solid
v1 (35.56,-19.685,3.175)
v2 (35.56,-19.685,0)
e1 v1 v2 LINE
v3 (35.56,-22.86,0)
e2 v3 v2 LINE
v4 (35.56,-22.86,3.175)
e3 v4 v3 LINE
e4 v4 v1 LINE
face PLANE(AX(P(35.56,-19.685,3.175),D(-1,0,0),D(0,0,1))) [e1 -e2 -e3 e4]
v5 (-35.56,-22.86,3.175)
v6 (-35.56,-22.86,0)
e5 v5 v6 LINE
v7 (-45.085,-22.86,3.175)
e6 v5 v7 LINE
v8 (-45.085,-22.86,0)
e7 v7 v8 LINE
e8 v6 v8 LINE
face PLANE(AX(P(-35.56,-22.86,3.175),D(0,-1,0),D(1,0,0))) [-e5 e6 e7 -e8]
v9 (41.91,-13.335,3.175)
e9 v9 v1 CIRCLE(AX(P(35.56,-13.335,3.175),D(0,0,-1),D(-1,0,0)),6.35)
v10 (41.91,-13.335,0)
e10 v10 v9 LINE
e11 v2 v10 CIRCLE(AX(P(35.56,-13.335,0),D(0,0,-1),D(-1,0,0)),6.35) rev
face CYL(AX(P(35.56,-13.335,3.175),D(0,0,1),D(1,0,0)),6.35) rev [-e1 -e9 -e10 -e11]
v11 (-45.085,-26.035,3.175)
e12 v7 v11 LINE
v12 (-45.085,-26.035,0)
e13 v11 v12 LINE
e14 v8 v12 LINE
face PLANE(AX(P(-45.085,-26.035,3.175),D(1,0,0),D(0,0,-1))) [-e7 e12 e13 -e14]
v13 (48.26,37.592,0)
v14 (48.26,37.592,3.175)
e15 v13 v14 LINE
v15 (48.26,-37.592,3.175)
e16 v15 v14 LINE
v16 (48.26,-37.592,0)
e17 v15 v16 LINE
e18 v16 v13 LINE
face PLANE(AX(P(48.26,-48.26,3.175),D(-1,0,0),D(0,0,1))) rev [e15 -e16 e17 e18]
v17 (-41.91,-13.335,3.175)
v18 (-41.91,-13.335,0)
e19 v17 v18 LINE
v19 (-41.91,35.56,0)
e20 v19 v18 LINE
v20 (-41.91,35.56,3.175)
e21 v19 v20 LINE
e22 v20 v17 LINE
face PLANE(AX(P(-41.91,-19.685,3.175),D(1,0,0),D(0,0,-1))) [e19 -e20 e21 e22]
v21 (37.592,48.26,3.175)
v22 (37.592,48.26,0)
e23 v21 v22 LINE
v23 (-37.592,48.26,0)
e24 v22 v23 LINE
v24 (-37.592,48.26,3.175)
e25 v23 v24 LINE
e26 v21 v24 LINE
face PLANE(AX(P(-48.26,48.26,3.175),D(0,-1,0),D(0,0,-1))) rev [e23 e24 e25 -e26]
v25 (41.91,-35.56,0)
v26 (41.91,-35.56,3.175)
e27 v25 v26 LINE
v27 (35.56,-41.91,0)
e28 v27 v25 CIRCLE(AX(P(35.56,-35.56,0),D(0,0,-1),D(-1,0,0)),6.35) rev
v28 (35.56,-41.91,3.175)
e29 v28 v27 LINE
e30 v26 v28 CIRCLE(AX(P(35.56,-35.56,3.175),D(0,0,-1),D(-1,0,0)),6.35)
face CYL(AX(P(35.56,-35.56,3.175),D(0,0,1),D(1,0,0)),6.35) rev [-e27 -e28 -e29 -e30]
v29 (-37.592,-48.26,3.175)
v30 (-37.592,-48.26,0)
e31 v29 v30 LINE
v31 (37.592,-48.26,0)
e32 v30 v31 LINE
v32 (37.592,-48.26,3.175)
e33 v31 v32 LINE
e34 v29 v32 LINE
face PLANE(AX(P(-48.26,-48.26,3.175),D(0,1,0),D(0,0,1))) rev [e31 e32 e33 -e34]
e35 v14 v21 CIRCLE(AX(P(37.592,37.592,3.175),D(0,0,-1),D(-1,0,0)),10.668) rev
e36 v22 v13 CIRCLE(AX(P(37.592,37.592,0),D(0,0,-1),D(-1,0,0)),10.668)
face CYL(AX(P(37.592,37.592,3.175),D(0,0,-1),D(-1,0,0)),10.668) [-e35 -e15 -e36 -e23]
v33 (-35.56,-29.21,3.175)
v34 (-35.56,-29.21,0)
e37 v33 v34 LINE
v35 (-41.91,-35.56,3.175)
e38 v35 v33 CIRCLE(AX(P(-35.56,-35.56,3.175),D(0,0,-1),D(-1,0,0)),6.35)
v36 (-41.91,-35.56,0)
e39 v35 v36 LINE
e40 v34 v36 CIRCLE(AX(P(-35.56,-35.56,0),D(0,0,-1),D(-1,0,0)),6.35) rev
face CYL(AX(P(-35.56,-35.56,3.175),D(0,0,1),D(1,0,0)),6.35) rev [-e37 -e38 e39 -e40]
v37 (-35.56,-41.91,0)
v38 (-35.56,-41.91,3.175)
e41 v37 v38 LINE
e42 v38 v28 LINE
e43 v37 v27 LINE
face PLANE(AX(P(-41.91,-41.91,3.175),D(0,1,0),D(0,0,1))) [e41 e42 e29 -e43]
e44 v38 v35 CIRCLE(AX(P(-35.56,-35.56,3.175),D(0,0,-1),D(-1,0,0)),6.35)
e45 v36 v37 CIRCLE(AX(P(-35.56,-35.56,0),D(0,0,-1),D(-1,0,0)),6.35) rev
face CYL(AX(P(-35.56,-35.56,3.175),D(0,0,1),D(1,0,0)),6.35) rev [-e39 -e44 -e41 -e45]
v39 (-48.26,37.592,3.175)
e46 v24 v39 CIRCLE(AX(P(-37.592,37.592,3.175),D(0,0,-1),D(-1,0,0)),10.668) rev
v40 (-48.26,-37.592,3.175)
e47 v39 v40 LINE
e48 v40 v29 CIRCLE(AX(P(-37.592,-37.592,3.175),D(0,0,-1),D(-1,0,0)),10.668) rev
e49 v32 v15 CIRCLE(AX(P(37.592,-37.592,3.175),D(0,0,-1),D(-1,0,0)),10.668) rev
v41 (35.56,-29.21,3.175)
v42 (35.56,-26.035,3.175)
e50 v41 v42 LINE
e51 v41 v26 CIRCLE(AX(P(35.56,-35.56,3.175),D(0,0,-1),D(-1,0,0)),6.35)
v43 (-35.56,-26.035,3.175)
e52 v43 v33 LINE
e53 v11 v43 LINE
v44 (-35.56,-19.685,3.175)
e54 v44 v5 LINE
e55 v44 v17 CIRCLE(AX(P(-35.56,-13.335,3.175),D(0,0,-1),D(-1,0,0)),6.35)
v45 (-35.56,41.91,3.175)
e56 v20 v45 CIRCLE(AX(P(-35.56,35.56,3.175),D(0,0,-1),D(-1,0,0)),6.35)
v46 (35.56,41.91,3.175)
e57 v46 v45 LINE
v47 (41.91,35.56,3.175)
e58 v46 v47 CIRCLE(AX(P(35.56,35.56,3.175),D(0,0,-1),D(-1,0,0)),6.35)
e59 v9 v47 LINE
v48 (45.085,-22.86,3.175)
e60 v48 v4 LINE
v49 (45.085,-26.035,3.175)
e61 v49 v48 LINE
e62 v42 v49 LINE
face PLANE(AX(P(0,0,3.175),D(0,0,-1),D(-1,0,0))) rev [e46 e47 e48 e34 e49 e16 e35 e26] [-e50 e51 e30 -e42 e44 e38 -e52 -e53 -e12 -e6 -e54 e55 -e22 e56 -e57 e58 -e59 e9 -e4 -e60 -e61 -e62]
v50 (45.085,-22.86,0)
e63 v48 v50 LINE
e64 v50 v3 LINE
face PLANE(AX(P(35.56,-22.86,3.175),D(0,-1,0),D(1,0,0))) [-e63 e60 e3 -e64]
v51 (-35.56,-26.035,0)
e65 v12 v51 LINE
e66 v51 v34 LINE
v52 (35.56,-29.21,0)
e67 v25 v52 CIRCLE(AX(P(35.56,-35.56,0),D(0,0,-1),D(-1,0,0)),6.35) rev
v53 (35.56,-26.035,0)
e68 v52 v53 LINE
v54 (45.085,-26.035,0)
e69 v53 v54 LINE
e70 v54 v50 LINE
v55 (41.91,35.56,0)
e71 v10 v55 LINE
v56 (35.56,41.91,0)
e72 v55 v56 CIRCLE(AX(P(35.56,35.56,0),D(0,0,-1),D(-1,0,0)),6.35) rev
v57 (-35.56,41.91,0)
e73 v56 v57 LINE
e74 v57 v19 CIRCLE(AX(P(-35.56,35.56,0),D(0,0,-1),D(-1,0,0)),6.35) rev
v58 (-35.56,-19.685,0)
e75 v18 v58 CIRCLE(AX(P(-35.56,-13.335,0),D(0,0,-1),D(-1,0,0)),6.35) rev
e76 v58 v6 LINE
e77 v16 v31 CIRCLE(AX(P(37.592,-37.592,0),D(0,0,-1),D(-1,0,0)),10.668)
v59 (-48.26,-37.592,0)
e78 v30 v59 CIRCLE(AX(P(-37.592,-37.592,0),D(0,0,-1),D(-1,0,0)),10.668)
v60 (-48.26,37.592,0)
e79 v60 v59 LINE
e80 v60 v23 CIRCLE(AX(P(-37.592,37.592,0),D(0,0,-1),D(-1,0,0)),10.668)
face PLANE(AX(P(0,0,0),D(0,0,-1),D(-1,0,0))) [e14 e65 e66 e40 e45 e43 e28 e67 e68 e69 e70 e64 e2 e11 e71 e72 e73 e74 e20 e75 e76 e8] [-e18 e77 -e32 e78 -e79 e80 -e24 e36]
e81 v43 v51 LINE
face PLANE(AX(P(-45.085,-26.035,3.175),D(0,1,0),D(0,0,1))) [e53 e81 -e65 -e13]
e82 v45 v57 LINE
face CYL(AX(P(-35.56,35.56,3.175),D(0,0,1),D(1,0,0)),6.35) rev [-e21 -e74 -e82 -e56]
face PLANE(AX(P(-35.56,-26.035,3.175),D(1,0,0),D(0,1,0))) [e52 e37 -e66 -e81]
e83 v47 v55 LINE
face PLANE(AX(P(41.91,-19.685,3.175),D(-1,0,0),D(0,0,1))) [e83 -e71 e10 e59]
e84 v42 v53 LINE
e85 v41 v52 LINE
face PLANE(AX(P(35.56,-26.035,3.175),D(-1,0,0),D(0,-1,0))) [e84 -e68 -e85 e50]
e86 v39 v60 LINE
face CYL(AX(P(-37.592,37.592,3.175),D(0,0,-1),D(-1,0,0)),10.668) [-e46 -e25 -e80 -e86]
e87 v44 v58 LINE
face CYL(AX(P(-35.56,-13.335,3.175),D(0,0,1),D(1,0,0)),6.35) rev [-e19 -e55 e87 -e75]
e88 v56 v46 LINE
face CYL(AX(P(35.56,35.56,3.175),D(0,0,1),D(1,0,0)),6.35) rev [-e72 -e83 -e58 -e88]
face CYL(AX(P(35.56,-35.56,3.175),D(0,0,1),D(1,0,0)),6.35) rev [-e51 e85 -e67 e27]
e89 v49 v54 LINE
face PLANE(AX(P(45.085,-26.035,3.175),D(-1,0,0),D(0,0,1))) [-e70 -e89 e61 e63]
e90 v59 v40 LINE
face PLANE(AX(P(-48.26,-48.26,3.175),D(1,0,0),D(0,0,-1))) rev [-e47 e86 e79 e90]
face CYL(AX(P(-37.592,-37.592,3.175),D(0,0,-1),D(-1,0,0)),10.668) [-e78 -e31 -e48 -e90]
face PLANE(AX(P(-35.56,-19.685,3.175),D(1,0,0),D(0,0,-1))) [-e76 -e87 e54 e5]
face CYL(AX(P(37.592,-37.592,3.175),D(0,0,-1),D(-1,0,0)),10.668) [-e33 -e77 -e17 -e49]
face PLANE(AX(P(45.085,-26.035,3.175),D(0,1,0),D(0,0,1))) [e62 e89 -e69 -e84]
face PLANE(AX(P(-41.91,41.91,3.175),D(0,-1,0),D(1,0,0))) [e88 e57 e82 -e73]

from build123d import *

# Parameters (mm, degrees)
SKETCH1_W           = 96.52
SKETCH1_H           = 96.52
BOSS_EXTRUDE1_DEPTH = 3.175
FILLET1_R           = 10.668
FILLET2_R           = 6.35
FILLET3_R           = 6.35


with BuildPart() as part:
    # Sketch1 → Boss-Extrude1 (new body)
    with BuildSketch(Plane.XY):
        Rectangle(SKETCH1_W, SKETCH1_H)
        Polygon((-41.91, -41.91), (-41.91, -29.21), (-35.56, -29.21), (-35.56, -26.035), (-45.085, -26.035), (-45.085, -22.86), (-35.56, -22.86), (-35.56, -19.685), (-41.91, -19.685), (-41.91, 41.91), (41.91, 41.91), (41.91, -19.685), (35.56, -19.685), (35.56, -22.86), (45.085, -22.86), (45.085, -26.035), (35.56, -26.035), (35.56, -29.21), (41.91, -29.21), (41.91, -41.91), align=None, mode=Mode.SUBTRACT)
    extrude(amount=BOSS_EXTRUDE1_DEPTH)

    # Fillet1
    fillet1_edges = [part.edges().sort_by_distance(p)[0] for p in [
        (48.26, -48.26, 1.5875),
        (-48.26, -48.26, 1.5875),
        (-48.26, 48.26, 1.5875),
        (48.26, 48.26, 1.5875),
    ]]
    fillet(fillet1_edges, radius=FILLET1_R)

    # Fillet2
    fillet2_edges = [part.edges().sort_by_distance(p)[0] for p in [
        (-41.91, -41.91, 1.5875),
        (41.91, -41.91, 1.5875),
        (41.91, 41.91, 1.5875),
        (-41.91, 41.91, 1.5875),
    ]]
    fillet(fillet2_edges, radius=FILLET2_R)

    # Fillet3
    fillet3_edges = [part.edges().sort_by_distance(p)[0] for p in [
        (41.91, -29.21, 1.5875),
        (41.91, -19.685, 1.5875),
        (-41.91, -19.685, 1.5875),
        (-41.91, -29.21, 1.5875),
    ]]
    fillet(fillet3_edges, radius=FILLET3_R - 0.0001)  # a hair under: the kernel refuses the full size


solid = part.part
